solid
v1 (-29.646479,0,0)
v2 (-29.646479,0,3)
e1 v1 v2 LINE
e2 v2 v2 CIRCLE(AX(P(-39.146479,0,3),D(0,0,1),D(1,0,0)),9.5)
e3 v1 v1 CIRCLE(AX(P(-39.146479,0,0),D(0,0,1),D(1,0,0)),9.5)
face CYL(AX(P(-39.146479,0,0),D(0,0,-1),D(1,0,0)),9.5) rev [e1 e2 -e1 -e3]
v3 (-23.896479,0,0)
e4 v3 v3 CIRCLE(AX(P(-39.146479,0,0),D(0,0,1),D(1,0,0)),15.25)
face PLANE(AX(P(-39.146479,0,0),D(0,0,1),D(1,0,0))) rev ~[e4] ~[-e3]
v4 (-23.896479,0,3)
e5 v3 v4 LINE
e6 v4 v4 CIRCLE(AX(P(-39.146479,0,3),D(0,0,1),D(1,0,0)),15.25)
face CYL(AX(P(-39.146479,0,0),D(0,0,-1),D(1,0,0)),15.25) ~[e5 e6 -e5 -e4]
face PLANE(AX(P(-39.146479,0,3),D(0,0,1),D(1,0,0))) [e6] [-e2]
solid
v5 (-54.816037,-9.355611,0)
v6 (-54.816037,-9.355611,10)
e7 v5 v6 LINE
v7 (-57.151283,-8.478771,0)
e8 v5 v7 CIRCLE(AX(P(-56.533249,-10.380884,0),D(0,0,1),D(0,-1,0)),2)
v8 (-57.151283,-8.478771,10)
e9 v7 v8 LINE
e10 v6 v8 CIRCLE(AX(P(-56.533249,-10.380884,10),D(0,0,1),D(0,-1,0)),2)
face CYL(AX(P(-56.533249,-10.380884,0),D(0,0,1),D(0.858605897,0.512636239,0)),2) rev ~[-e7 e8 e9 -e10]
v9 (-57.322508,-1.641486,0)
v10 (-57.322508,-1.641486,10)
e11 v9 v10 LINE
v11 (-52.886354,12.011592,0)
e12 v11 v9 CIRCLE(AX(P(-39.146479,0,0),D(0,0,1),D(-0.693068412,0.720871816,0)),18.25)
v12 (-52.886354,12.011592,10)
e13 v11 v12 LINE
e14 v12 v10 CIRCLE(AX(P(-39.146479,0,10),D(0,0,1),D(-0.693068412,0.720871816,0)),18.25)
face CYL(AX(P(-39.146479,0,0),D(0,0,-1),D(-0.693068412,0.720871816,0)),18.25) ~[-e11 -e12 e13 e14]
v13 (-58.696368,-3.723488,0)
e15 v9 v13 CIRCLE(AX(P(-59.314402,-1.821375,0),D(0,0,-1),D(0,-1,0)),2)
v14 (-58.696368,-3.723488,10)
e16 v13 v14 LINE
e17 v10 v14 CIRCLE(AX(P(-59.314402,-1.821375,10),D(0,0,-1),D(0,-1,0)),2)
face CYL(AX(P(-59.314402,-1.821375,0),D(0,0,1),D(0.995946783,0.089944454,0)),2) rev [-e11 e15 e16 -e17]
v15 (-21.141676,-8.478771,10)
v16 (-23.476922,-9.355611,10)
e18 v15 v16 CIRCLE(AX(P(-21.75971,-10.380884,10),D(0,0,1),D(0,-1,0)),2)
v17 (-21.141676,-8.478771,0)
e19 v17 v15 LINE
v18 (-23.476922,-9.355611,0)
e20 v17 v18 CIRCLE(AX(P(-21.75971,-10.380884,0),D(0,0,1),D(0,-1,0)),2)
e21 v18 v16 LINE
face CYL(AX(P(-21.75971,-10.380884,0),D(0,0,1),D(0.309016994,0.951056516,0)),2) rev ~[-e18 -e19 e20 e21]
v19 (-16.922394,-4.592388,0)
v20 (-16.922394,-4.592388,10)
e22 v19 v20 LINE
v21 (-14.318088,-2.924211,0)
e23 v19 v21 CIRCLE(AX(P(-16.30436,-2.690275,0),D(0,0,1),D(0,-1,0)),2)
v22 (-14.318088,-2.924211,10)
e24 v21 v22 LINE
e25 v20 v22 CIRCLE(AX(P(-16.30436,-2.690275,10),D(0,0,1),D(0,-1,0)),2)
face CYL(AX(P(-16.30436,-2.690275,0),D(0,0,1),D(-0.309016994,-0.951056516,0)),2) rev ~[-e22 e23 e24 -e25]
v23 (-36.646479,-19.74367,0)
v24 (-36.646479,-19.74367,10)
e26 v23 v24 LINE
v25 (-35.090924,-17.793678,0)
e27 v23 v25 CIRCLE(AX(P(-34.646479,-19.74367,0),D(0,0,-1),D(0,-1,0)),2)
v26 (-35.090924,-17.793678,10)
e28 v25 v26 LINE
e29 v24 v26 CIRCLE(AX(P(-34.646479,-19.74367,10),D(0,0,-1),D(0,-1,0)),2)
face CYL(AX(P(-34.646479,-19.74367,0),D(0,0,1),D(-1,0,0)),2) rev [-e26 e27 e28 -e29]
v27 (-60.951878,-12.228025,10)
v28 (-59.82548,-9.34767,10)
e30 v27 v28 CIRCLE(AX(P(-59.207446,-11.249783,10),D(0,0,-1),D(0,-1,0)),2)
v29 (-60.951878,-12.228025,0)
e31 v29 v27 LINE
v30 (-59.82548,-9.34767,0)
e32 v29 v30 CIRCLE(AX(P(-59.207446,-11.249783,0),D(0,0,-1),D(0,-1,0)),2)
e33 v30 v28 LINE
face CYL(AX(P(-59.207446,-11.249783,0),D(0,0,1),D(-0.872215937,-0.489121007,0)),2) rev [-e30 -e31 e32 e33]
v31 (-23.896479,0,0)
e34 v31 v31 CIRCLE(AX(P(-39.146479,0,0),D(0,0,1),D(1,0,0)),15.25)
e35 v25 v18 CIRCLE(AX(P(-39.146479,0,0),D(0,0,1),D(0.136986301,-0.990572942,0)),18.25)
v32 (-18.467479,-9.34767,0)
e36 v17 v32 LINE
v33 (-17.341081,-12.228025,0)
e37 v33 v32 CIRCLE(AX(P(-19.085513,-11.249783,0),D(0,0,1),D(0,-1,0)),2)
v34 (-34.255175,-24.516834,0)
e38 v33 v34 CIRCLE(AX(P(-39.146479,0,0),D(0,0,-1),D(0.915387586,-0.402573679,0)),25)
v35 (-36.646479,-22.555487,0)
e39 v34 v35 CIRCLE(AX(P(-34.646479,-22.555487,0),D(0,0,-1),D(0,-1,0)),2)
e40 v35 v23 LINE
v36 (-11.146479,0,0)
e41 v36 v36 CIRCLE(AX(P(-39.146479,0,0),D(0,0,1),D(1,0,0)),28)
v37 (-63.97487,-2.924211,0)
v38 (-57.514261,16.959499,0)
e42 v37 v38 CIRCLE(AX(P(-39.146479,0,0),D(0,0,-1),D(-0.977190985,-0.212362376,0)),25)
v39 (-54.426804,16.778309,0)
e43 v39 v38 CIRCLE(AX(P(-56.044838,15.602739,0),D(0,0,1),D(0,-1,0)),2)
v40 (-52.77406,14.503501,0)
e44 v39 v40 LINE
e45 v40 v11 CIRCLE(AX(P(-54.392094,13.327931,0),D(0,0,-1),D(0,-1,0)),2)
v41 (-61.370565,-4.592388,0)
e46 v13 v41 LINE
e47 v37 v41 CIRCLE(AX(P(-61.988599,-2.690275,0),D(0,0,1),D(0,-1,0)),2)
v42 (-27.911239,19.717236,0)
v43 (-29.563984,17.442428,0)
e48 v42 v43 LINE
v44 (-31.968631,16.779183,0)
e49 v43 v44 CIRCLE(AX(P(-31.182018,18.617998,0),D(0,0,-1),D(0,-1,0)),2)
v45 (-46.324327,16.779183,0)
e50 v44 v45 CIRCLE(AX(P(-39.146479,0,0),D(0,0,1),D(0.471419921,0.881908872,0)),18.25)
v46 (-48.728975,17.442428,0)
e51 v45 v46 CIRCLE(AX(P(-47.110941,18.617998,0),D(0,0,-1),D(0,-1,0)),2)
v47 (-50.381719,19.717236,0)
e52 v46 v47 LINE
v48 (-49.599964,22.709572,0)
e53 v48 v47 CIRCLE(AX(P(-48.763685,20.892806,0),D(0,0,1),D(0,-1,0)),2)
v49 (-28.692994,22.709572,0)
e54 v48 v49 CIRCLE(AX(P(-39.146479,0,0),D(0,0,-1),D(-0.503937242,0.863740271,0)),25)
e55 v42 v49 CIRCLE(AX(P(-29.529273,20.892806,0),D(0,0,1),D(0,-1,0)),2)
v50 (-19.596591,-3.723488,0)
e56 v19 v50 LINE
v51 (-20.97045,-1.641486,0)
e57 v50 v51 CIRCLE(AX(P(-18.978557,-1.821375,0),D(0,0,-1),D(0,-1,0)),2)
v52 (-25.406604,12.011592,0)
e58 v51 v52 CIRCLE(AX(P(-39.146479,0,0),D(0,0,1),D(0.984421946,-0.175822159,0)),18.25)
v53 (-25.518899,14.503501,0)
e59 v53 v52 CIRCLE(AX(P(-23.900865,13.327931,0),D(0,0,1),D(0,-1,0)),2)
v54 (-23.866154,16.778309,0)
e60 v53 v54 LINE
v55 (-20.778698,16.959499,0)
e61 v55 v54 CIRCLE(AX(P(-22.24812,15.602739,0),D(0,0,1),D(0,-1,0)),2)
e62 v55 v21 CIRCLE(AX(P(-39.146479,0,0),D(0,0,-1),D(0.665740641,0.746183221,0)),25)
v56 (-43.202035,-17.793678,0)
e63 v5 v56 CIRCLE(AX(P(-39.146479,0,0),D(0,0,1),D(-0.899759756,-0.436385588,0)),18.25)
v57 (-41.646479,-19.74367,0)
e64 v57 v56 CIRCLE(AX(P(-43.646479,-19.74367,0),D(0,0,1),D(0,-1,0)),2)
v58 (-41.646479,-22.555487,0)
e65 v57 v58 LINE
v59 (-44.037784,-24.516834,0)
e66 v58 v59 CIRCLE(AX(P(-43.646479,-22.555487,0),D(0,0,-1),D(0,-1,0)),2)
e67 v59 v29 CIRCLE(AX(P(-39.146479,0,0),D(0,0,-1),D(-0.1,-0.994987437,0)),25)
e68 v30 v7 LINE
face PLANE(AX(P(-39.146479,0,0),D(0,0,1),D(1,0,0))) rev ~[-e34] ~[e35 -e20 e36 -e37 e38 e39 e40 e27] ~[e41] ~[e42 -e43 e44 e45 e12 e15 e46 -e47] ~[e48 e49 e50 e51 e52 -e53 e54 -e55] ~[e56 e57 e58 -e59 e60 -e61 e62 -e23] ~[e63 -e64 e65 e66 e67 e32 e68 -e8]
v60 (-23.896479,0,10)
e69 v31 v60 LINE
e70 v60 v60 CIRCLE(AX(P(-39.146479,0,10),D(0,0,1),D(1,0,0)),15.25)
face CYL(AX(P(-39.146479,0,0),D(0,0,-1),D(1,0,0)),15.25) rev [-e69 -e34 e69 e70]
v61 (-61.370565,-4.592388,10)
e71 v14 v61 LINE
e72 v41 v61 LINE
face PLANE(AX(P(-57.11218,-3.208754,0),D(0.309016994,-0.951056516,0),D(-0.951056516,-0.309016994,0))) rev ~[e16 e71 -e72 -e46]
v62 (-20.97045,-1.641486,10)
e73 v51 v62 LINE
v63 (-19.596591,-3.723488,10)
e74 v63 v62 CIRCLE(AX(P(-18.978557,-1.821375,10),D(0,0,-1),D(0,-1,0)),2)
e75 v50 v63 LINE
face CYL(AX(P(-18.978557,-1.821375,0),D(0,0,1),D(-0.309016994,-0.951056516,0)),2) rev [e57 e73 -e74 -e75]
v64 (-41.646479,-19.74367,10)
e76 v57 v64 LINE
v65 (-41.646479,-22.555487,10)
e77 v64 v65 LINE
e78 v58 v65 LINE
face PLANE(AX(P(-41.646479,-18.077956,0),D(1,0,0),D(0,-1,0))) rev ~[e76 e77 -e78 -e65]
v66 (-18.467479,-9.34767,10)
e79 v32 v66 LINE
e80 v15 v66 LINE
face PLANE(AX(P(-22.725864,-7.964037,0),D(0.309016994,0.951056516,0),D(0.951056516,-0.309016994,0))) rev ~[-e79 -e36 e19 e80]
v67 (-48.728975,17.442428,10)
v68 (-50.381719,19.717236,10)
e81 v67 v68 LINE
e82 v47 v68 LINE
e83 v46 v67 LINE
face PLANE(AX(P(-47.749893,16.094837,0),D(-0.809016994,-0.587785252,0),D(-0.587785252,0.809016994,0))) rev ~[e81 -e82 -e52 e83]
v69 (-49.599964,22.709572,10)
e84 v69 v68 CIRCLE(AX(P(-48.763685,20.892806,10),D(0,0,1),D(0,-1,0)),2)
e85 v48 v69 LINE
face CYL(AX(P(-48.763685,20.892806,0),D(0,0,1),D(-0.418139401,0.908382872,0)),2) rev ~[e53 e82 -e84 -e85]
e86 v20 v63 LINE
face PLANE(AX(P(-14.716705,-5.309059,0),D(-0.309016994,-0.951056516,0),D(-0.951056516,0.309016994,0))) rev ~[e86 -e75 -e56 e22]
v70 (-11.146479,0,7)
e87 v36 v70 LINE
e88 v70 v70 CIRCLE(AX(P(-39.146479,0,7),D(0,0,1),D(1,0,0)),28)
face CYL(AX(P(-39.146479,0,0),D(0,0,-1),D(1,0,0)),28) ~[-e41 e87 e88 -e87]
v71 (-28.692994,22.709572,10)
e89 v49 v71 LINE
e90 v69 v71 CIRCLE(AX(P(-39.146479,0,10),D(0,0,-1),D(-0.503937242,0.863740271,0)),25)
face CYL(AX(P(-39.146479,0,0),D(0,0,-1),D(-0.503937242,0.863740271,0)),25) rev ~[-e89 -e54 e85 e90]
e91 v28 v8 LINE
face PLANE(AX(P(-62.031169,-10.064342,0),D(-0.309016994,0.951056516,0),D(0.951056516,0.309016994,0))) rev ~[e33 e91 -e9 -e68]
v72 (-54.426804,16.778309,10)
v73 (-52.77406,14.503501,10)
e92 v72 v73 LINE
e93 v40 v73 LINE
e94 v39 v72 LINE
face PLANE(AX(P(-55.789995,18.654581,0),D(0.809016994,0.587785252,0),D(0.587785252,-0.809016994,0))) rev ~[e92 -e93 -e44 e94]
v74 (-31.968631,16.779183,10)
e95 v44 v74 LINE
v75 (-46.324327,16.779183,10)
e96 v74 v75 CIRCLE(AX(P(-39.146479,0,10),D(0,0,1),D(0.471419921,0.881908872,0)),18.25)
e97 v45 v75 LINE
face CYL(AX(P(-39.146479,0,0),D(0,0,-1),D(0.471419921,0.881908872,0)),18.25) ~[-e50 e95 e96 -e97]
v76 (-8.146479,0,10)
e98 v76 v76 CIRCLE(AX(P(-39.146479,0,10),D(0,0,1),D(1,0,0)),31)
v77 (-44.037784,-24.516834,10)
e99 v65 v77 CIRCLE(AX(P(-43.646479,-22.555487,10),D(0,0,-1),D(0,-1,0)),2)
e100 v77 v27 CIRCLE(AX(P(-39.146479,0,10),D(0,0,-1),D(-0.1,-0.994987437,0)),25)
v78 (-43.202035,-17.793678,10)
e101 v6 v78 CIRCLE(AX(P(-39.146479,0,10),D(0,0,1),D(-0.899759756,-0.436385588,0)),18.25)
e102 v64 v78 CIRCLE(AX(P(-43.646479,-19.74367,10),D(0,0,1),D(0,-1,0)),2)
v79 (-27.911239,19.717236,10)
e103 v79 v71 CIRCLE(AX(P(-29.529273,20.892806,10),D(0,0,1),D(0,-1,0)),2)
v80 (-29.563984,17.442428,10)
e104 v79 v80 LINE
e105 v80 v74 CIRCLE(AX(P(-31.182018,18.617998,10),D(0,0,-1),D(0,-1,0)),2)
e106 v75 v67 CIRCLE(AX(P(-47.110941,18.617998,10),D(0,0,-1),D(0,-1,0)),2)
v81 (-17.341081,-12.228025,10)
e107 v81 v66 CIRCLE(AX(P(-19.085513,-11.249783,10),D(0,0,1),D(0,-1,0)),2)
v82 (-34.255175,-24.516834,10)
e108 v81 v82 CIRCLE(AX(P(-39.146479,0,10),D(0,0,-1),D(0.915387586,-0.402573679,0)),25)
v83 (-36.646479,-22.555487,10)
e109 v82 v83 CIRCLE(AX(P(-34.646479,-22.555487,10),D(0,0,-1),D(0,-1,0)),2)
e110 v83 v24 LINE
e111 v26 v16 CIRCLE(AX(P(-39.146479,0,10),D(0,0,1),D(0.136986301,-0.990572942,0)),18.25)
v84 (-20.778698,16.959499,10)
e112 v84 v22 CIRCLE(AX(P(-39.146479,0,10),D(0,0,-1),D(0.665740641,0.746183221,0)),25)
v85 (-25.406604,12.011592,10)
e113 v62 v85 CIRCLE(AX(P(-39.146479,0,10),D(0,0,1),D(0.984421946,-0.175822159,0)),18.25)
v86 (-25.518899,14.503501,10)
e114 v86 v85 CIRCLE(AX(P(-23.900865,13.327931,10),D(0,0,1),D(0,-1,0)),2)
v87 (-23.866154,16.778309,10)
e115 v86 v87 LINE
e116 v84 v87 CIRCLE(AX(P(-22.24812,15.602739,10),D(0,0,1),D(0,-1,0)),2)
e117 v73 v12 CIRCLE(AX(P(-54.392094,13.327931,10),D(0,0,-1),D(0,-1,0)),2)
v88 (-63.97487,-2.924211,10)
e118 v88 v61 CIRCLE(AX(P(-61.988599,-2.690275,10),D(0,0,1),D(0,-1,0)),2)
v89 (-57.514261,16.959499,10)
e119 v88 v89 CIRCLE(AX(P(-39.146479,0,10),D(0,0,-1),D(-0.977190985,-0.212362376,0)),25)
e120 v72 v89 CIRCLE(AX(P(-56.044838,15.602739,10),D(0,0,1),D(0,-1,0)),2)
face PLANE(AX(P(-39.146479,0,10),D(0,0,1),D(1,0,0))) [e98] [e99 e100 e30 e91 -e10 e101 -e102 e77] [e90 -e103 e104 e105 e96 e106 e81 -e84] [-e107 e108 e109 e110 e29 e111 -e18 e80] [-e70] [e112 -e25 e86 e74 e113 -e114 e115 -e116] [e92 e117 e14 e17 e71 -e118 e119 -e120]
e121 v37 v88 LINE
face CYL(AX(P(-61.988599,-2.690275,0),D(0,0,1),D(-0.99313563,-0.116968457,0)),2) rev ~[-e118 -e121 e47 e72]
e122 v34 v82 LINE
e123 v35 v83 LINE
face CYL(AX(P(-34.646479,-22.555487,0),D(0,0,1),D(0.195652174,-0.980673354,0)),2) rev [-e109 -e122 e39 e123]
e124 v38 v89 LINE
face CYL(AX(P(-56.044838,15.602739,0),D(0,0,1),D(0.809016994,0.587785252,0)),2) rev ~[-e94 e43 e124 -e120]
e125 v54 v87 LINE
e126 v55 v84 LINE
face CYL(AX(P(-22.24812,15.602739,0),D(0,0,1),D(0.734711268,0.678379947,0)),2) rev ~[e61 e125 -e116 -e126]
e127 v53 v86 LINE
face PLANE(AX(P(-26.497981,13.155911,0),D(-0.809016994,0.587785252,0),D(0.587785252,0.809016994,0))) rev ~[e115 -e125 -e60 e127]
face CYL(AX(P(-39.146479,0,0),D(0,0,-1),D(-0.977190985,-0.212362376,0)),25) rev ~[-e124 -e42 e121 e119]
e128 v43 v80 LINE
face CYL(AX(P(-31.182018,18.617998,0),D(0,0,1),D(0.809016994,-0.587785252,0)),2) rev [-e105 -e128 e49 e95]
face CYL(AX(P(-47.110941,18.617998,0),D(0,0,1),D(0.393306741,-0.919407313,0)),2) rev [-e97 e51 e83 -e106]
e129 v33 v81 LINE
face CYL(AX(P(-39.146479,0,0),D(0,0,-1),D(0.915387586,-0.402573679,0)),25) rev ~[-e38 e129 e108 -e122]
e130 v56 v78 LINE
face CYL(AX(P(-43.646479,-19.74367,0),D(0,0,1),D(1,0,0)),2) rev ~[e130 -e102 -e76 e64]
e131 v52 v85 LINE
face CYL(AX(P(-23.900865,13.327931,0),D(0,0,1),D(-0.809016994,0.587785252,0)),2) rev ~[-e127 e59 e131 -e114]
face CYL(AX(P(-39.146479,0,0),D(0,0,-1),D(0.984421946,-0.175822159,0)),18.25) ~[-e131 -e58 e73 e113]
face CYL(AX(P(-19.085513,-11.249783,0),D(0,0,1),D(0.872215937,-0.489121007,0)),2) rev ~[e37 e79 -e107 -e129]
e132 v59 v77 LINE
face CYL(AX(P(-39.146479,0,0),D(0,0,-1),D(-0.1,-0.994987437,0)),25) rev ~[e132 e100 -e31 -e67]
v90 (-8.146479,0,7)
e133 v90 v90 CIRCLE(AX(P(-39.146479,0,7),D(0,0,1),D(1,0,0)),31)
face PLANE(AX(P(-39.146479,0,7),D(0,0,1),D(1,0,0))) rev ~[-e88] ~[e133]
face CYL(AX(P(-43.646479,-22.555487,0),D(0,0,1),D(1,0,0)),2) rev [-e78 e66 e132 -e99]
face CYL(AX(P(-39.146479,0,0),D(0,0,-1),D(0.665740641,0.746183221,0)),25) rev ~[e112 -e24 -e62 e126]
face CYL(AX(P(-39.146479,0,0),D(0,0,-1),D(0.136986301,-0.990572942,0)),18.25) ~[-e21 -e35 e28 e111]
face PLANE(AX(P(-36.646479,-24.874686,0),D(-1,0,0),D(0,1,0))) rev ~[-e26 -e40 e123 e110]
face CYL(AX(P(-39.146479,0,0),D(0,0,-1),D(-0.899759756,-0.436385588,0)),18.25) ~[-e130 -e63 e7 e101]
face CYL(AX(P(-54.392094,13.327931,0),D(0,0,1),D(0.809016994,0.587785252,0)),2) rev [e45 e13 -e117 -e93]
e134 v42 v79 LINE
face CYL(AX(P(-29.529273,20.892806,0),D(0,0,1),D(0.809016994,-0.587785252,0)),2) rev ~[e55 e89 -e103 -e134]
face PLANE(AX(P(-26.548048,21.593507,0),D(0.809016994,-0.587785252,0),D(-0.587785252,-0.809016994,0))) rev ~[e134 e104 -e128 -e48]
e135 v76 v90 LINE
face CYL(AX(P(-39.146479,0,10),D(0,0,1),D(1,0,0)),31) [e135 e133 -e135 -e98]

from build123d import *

# Parameters (mm, degrees)
F0_R     = 15.25
F0_R_2   = 9.5
F1_DEPTH = 3
F0_R_3   = 28
F2_DEPTH = 10
F3_R     = 31
F3_R_2   = 28
F4_DEPTH = 3
F5_R     = 2


# Not quite as in the source:
# - a feature names something its author has since deleted; it is built from what else it names


with BuildPart() as f1:
    # F0 (on Top) → F1 (new body)
    with BuildSketch(Plane.XY):
        with Locations((-39.1464792192, 0)):
            Circle(F0_R)
        with Locations((-39.1464792192, 0)):
            Circle(F0_R_2, mode=Mode.SUBTRACT)
    extrude(amount=F1_DEPTH)


with BuildPart() as f2:
    # F0 (on Top) → F2 (new body)
    with BuildSketch(Plane.XY):
        with Locations((-39.1464792192, 0)):
            Circle(F0_R_3)
        with BuildLine():
            ThreePointArc((-41.6464792192, -24.8746859277), (-53.8411105265, -20.2254248594), (-62.0311688756, -10.0643419721))
            Line((-62.0311688756, -10.0643419721), (-55.5670947689, -7.9640369769))
            ThreePointArc((-55.5670947689, -7.9640369769), (-49.8735600735, -14.7645601473), (-41.6464792192, -18.0779561898))
            Line((-41.6464792192, -18.0779561898), (-41.6464792192, -24.8746859277))
        make_face(mode=Mode.SUBTRACT)
        with BuildLine():
            Line((-36.6464792192, -24.8746859277), (-36.6464792192, -18.0779561898))
            ThreePointArc((-36.6464792192, -18.0779561898), (-28.4193983649, -14.7645601473), (-22.7258636695, -7.9640369769))
            Line((-22.7258636695, -7.9640369769), (-16.2617895628, -10.0643419721))
            ThreePointArc((-16.2617895628, -10.0643419721), (-24.4518479119, -20.2254248594), (-36.6464792192, -24.8746859277))
        make_face(mode=Mode.SUBTRACT)
        with BuildLine():
            ThreePointArc((-51.7949777451, 13.1559106504), (-56.5032606416, 5.6395601473), (-57.1121797407, -3.2087543955))
            Line((-57.1121797407, -3.2087543955), (-63.5762538474, -5.3090593907))
            ThreePointArc((-63.5762538474, -5.3090593907), (-62.9228921266, 7.7254248594), (-55.7899952488, 18.6545805145))
            Line((-55.7899952488, 18.6545805145), (-51.7949777451, 13.1559106504))
        make_face(mode=Mode.SUBTRACT)
        with BuildLine():
            ThreePointArc((-30.5430656652, 16.0948369118), (-39.1464792192, 18.25), (-47.7498927732, 16.0948369118))
            Line((-47.7498927732, 16.0948369118), (-51.7449102769, 21.593506776))
            ThreePointArc((-51.7449102769, 21.593506776), (-39.1464792192, 25), (-26.5480481614, 21.593506776))
            Line((-26.5480481614, 21.593506776), (-30.5430656652, 16.0948369118))
        make_face(mode=Mode.SUBTRACT)
        with Locations((-39.1464792192, 0)):
            Circle(F0_R, mode=Mode.SUBTRACT)
        with BuildLine():
            ThreePointArc((-21.1807786977, -3.2087543955), (-21.7896977968, 5.6395601473), (-26.4979806933, 13.1559106504))
            Line((-26.4979806933, 13.1559106504), (-22.5029631896, 18.6545805145))
            ThreePointArc((-22.5029631896, 18.6545805145), (-15.3700663118, 7.7254248594), (-14.716704591, -5.3090593907))
            Line((-14.716704591, -5.3090593907), (-21.1807786977, -3.2087543955))
        make_face(mode=Mode.SUBTRACT)
    extrude(amount=F2_DEPTH)

    # F3 (on face) → F4 (join)
    with BuildSketch(Plane.XY.offset(10)):
        with Locations((-39.1464792192, 0)):
            Circle(F3_R)
        with Locations((-39.1464792192, 0)):
            Circle(F3_R_2, mode=Mode.SUBTRACT)
    extrude(amount=-F4_DEPTH)

    # F5
    f5_edges = [f2.edges().sort_by_distance(p)[0] for p in [
        (-62.031169, -10.064342, 5),
        (-55.567095, -7.964037, 5),
        (-41.646479, -24.874686, 5),
        (-41.646479, -18.077956, 5),
        (-36.646479, -18.077956, 5),
        (-36.646479, -24.874686, 5),
        (-16.26179, -10.064342, 5),
        (-22.725864, -7.964037, 5),
        (-14.716705, -5.309059, 5),
        (-21.180779, -3.208754, 5),
        (-26.497981, 13.155911, 5),
        (-22.502963, 18.654581, 5),
        (-26.548048, 21.593507, 5),
        (-30.543066, 16.094837, 5),
        (-47.749893, 16.094837, 5),
        (-51.74491, 21.593507, 5),
        (-51.794978, 13.155911, 5),
        (-57.11218, -3.208754, 5),
        (-63.576254, -5.309059, 5),
        (-55.789995, 18.654581, 5),
    ]]
    fillet(f5_edges, radius=F5_R)


solid = Compound([f1.part, f2.part])
